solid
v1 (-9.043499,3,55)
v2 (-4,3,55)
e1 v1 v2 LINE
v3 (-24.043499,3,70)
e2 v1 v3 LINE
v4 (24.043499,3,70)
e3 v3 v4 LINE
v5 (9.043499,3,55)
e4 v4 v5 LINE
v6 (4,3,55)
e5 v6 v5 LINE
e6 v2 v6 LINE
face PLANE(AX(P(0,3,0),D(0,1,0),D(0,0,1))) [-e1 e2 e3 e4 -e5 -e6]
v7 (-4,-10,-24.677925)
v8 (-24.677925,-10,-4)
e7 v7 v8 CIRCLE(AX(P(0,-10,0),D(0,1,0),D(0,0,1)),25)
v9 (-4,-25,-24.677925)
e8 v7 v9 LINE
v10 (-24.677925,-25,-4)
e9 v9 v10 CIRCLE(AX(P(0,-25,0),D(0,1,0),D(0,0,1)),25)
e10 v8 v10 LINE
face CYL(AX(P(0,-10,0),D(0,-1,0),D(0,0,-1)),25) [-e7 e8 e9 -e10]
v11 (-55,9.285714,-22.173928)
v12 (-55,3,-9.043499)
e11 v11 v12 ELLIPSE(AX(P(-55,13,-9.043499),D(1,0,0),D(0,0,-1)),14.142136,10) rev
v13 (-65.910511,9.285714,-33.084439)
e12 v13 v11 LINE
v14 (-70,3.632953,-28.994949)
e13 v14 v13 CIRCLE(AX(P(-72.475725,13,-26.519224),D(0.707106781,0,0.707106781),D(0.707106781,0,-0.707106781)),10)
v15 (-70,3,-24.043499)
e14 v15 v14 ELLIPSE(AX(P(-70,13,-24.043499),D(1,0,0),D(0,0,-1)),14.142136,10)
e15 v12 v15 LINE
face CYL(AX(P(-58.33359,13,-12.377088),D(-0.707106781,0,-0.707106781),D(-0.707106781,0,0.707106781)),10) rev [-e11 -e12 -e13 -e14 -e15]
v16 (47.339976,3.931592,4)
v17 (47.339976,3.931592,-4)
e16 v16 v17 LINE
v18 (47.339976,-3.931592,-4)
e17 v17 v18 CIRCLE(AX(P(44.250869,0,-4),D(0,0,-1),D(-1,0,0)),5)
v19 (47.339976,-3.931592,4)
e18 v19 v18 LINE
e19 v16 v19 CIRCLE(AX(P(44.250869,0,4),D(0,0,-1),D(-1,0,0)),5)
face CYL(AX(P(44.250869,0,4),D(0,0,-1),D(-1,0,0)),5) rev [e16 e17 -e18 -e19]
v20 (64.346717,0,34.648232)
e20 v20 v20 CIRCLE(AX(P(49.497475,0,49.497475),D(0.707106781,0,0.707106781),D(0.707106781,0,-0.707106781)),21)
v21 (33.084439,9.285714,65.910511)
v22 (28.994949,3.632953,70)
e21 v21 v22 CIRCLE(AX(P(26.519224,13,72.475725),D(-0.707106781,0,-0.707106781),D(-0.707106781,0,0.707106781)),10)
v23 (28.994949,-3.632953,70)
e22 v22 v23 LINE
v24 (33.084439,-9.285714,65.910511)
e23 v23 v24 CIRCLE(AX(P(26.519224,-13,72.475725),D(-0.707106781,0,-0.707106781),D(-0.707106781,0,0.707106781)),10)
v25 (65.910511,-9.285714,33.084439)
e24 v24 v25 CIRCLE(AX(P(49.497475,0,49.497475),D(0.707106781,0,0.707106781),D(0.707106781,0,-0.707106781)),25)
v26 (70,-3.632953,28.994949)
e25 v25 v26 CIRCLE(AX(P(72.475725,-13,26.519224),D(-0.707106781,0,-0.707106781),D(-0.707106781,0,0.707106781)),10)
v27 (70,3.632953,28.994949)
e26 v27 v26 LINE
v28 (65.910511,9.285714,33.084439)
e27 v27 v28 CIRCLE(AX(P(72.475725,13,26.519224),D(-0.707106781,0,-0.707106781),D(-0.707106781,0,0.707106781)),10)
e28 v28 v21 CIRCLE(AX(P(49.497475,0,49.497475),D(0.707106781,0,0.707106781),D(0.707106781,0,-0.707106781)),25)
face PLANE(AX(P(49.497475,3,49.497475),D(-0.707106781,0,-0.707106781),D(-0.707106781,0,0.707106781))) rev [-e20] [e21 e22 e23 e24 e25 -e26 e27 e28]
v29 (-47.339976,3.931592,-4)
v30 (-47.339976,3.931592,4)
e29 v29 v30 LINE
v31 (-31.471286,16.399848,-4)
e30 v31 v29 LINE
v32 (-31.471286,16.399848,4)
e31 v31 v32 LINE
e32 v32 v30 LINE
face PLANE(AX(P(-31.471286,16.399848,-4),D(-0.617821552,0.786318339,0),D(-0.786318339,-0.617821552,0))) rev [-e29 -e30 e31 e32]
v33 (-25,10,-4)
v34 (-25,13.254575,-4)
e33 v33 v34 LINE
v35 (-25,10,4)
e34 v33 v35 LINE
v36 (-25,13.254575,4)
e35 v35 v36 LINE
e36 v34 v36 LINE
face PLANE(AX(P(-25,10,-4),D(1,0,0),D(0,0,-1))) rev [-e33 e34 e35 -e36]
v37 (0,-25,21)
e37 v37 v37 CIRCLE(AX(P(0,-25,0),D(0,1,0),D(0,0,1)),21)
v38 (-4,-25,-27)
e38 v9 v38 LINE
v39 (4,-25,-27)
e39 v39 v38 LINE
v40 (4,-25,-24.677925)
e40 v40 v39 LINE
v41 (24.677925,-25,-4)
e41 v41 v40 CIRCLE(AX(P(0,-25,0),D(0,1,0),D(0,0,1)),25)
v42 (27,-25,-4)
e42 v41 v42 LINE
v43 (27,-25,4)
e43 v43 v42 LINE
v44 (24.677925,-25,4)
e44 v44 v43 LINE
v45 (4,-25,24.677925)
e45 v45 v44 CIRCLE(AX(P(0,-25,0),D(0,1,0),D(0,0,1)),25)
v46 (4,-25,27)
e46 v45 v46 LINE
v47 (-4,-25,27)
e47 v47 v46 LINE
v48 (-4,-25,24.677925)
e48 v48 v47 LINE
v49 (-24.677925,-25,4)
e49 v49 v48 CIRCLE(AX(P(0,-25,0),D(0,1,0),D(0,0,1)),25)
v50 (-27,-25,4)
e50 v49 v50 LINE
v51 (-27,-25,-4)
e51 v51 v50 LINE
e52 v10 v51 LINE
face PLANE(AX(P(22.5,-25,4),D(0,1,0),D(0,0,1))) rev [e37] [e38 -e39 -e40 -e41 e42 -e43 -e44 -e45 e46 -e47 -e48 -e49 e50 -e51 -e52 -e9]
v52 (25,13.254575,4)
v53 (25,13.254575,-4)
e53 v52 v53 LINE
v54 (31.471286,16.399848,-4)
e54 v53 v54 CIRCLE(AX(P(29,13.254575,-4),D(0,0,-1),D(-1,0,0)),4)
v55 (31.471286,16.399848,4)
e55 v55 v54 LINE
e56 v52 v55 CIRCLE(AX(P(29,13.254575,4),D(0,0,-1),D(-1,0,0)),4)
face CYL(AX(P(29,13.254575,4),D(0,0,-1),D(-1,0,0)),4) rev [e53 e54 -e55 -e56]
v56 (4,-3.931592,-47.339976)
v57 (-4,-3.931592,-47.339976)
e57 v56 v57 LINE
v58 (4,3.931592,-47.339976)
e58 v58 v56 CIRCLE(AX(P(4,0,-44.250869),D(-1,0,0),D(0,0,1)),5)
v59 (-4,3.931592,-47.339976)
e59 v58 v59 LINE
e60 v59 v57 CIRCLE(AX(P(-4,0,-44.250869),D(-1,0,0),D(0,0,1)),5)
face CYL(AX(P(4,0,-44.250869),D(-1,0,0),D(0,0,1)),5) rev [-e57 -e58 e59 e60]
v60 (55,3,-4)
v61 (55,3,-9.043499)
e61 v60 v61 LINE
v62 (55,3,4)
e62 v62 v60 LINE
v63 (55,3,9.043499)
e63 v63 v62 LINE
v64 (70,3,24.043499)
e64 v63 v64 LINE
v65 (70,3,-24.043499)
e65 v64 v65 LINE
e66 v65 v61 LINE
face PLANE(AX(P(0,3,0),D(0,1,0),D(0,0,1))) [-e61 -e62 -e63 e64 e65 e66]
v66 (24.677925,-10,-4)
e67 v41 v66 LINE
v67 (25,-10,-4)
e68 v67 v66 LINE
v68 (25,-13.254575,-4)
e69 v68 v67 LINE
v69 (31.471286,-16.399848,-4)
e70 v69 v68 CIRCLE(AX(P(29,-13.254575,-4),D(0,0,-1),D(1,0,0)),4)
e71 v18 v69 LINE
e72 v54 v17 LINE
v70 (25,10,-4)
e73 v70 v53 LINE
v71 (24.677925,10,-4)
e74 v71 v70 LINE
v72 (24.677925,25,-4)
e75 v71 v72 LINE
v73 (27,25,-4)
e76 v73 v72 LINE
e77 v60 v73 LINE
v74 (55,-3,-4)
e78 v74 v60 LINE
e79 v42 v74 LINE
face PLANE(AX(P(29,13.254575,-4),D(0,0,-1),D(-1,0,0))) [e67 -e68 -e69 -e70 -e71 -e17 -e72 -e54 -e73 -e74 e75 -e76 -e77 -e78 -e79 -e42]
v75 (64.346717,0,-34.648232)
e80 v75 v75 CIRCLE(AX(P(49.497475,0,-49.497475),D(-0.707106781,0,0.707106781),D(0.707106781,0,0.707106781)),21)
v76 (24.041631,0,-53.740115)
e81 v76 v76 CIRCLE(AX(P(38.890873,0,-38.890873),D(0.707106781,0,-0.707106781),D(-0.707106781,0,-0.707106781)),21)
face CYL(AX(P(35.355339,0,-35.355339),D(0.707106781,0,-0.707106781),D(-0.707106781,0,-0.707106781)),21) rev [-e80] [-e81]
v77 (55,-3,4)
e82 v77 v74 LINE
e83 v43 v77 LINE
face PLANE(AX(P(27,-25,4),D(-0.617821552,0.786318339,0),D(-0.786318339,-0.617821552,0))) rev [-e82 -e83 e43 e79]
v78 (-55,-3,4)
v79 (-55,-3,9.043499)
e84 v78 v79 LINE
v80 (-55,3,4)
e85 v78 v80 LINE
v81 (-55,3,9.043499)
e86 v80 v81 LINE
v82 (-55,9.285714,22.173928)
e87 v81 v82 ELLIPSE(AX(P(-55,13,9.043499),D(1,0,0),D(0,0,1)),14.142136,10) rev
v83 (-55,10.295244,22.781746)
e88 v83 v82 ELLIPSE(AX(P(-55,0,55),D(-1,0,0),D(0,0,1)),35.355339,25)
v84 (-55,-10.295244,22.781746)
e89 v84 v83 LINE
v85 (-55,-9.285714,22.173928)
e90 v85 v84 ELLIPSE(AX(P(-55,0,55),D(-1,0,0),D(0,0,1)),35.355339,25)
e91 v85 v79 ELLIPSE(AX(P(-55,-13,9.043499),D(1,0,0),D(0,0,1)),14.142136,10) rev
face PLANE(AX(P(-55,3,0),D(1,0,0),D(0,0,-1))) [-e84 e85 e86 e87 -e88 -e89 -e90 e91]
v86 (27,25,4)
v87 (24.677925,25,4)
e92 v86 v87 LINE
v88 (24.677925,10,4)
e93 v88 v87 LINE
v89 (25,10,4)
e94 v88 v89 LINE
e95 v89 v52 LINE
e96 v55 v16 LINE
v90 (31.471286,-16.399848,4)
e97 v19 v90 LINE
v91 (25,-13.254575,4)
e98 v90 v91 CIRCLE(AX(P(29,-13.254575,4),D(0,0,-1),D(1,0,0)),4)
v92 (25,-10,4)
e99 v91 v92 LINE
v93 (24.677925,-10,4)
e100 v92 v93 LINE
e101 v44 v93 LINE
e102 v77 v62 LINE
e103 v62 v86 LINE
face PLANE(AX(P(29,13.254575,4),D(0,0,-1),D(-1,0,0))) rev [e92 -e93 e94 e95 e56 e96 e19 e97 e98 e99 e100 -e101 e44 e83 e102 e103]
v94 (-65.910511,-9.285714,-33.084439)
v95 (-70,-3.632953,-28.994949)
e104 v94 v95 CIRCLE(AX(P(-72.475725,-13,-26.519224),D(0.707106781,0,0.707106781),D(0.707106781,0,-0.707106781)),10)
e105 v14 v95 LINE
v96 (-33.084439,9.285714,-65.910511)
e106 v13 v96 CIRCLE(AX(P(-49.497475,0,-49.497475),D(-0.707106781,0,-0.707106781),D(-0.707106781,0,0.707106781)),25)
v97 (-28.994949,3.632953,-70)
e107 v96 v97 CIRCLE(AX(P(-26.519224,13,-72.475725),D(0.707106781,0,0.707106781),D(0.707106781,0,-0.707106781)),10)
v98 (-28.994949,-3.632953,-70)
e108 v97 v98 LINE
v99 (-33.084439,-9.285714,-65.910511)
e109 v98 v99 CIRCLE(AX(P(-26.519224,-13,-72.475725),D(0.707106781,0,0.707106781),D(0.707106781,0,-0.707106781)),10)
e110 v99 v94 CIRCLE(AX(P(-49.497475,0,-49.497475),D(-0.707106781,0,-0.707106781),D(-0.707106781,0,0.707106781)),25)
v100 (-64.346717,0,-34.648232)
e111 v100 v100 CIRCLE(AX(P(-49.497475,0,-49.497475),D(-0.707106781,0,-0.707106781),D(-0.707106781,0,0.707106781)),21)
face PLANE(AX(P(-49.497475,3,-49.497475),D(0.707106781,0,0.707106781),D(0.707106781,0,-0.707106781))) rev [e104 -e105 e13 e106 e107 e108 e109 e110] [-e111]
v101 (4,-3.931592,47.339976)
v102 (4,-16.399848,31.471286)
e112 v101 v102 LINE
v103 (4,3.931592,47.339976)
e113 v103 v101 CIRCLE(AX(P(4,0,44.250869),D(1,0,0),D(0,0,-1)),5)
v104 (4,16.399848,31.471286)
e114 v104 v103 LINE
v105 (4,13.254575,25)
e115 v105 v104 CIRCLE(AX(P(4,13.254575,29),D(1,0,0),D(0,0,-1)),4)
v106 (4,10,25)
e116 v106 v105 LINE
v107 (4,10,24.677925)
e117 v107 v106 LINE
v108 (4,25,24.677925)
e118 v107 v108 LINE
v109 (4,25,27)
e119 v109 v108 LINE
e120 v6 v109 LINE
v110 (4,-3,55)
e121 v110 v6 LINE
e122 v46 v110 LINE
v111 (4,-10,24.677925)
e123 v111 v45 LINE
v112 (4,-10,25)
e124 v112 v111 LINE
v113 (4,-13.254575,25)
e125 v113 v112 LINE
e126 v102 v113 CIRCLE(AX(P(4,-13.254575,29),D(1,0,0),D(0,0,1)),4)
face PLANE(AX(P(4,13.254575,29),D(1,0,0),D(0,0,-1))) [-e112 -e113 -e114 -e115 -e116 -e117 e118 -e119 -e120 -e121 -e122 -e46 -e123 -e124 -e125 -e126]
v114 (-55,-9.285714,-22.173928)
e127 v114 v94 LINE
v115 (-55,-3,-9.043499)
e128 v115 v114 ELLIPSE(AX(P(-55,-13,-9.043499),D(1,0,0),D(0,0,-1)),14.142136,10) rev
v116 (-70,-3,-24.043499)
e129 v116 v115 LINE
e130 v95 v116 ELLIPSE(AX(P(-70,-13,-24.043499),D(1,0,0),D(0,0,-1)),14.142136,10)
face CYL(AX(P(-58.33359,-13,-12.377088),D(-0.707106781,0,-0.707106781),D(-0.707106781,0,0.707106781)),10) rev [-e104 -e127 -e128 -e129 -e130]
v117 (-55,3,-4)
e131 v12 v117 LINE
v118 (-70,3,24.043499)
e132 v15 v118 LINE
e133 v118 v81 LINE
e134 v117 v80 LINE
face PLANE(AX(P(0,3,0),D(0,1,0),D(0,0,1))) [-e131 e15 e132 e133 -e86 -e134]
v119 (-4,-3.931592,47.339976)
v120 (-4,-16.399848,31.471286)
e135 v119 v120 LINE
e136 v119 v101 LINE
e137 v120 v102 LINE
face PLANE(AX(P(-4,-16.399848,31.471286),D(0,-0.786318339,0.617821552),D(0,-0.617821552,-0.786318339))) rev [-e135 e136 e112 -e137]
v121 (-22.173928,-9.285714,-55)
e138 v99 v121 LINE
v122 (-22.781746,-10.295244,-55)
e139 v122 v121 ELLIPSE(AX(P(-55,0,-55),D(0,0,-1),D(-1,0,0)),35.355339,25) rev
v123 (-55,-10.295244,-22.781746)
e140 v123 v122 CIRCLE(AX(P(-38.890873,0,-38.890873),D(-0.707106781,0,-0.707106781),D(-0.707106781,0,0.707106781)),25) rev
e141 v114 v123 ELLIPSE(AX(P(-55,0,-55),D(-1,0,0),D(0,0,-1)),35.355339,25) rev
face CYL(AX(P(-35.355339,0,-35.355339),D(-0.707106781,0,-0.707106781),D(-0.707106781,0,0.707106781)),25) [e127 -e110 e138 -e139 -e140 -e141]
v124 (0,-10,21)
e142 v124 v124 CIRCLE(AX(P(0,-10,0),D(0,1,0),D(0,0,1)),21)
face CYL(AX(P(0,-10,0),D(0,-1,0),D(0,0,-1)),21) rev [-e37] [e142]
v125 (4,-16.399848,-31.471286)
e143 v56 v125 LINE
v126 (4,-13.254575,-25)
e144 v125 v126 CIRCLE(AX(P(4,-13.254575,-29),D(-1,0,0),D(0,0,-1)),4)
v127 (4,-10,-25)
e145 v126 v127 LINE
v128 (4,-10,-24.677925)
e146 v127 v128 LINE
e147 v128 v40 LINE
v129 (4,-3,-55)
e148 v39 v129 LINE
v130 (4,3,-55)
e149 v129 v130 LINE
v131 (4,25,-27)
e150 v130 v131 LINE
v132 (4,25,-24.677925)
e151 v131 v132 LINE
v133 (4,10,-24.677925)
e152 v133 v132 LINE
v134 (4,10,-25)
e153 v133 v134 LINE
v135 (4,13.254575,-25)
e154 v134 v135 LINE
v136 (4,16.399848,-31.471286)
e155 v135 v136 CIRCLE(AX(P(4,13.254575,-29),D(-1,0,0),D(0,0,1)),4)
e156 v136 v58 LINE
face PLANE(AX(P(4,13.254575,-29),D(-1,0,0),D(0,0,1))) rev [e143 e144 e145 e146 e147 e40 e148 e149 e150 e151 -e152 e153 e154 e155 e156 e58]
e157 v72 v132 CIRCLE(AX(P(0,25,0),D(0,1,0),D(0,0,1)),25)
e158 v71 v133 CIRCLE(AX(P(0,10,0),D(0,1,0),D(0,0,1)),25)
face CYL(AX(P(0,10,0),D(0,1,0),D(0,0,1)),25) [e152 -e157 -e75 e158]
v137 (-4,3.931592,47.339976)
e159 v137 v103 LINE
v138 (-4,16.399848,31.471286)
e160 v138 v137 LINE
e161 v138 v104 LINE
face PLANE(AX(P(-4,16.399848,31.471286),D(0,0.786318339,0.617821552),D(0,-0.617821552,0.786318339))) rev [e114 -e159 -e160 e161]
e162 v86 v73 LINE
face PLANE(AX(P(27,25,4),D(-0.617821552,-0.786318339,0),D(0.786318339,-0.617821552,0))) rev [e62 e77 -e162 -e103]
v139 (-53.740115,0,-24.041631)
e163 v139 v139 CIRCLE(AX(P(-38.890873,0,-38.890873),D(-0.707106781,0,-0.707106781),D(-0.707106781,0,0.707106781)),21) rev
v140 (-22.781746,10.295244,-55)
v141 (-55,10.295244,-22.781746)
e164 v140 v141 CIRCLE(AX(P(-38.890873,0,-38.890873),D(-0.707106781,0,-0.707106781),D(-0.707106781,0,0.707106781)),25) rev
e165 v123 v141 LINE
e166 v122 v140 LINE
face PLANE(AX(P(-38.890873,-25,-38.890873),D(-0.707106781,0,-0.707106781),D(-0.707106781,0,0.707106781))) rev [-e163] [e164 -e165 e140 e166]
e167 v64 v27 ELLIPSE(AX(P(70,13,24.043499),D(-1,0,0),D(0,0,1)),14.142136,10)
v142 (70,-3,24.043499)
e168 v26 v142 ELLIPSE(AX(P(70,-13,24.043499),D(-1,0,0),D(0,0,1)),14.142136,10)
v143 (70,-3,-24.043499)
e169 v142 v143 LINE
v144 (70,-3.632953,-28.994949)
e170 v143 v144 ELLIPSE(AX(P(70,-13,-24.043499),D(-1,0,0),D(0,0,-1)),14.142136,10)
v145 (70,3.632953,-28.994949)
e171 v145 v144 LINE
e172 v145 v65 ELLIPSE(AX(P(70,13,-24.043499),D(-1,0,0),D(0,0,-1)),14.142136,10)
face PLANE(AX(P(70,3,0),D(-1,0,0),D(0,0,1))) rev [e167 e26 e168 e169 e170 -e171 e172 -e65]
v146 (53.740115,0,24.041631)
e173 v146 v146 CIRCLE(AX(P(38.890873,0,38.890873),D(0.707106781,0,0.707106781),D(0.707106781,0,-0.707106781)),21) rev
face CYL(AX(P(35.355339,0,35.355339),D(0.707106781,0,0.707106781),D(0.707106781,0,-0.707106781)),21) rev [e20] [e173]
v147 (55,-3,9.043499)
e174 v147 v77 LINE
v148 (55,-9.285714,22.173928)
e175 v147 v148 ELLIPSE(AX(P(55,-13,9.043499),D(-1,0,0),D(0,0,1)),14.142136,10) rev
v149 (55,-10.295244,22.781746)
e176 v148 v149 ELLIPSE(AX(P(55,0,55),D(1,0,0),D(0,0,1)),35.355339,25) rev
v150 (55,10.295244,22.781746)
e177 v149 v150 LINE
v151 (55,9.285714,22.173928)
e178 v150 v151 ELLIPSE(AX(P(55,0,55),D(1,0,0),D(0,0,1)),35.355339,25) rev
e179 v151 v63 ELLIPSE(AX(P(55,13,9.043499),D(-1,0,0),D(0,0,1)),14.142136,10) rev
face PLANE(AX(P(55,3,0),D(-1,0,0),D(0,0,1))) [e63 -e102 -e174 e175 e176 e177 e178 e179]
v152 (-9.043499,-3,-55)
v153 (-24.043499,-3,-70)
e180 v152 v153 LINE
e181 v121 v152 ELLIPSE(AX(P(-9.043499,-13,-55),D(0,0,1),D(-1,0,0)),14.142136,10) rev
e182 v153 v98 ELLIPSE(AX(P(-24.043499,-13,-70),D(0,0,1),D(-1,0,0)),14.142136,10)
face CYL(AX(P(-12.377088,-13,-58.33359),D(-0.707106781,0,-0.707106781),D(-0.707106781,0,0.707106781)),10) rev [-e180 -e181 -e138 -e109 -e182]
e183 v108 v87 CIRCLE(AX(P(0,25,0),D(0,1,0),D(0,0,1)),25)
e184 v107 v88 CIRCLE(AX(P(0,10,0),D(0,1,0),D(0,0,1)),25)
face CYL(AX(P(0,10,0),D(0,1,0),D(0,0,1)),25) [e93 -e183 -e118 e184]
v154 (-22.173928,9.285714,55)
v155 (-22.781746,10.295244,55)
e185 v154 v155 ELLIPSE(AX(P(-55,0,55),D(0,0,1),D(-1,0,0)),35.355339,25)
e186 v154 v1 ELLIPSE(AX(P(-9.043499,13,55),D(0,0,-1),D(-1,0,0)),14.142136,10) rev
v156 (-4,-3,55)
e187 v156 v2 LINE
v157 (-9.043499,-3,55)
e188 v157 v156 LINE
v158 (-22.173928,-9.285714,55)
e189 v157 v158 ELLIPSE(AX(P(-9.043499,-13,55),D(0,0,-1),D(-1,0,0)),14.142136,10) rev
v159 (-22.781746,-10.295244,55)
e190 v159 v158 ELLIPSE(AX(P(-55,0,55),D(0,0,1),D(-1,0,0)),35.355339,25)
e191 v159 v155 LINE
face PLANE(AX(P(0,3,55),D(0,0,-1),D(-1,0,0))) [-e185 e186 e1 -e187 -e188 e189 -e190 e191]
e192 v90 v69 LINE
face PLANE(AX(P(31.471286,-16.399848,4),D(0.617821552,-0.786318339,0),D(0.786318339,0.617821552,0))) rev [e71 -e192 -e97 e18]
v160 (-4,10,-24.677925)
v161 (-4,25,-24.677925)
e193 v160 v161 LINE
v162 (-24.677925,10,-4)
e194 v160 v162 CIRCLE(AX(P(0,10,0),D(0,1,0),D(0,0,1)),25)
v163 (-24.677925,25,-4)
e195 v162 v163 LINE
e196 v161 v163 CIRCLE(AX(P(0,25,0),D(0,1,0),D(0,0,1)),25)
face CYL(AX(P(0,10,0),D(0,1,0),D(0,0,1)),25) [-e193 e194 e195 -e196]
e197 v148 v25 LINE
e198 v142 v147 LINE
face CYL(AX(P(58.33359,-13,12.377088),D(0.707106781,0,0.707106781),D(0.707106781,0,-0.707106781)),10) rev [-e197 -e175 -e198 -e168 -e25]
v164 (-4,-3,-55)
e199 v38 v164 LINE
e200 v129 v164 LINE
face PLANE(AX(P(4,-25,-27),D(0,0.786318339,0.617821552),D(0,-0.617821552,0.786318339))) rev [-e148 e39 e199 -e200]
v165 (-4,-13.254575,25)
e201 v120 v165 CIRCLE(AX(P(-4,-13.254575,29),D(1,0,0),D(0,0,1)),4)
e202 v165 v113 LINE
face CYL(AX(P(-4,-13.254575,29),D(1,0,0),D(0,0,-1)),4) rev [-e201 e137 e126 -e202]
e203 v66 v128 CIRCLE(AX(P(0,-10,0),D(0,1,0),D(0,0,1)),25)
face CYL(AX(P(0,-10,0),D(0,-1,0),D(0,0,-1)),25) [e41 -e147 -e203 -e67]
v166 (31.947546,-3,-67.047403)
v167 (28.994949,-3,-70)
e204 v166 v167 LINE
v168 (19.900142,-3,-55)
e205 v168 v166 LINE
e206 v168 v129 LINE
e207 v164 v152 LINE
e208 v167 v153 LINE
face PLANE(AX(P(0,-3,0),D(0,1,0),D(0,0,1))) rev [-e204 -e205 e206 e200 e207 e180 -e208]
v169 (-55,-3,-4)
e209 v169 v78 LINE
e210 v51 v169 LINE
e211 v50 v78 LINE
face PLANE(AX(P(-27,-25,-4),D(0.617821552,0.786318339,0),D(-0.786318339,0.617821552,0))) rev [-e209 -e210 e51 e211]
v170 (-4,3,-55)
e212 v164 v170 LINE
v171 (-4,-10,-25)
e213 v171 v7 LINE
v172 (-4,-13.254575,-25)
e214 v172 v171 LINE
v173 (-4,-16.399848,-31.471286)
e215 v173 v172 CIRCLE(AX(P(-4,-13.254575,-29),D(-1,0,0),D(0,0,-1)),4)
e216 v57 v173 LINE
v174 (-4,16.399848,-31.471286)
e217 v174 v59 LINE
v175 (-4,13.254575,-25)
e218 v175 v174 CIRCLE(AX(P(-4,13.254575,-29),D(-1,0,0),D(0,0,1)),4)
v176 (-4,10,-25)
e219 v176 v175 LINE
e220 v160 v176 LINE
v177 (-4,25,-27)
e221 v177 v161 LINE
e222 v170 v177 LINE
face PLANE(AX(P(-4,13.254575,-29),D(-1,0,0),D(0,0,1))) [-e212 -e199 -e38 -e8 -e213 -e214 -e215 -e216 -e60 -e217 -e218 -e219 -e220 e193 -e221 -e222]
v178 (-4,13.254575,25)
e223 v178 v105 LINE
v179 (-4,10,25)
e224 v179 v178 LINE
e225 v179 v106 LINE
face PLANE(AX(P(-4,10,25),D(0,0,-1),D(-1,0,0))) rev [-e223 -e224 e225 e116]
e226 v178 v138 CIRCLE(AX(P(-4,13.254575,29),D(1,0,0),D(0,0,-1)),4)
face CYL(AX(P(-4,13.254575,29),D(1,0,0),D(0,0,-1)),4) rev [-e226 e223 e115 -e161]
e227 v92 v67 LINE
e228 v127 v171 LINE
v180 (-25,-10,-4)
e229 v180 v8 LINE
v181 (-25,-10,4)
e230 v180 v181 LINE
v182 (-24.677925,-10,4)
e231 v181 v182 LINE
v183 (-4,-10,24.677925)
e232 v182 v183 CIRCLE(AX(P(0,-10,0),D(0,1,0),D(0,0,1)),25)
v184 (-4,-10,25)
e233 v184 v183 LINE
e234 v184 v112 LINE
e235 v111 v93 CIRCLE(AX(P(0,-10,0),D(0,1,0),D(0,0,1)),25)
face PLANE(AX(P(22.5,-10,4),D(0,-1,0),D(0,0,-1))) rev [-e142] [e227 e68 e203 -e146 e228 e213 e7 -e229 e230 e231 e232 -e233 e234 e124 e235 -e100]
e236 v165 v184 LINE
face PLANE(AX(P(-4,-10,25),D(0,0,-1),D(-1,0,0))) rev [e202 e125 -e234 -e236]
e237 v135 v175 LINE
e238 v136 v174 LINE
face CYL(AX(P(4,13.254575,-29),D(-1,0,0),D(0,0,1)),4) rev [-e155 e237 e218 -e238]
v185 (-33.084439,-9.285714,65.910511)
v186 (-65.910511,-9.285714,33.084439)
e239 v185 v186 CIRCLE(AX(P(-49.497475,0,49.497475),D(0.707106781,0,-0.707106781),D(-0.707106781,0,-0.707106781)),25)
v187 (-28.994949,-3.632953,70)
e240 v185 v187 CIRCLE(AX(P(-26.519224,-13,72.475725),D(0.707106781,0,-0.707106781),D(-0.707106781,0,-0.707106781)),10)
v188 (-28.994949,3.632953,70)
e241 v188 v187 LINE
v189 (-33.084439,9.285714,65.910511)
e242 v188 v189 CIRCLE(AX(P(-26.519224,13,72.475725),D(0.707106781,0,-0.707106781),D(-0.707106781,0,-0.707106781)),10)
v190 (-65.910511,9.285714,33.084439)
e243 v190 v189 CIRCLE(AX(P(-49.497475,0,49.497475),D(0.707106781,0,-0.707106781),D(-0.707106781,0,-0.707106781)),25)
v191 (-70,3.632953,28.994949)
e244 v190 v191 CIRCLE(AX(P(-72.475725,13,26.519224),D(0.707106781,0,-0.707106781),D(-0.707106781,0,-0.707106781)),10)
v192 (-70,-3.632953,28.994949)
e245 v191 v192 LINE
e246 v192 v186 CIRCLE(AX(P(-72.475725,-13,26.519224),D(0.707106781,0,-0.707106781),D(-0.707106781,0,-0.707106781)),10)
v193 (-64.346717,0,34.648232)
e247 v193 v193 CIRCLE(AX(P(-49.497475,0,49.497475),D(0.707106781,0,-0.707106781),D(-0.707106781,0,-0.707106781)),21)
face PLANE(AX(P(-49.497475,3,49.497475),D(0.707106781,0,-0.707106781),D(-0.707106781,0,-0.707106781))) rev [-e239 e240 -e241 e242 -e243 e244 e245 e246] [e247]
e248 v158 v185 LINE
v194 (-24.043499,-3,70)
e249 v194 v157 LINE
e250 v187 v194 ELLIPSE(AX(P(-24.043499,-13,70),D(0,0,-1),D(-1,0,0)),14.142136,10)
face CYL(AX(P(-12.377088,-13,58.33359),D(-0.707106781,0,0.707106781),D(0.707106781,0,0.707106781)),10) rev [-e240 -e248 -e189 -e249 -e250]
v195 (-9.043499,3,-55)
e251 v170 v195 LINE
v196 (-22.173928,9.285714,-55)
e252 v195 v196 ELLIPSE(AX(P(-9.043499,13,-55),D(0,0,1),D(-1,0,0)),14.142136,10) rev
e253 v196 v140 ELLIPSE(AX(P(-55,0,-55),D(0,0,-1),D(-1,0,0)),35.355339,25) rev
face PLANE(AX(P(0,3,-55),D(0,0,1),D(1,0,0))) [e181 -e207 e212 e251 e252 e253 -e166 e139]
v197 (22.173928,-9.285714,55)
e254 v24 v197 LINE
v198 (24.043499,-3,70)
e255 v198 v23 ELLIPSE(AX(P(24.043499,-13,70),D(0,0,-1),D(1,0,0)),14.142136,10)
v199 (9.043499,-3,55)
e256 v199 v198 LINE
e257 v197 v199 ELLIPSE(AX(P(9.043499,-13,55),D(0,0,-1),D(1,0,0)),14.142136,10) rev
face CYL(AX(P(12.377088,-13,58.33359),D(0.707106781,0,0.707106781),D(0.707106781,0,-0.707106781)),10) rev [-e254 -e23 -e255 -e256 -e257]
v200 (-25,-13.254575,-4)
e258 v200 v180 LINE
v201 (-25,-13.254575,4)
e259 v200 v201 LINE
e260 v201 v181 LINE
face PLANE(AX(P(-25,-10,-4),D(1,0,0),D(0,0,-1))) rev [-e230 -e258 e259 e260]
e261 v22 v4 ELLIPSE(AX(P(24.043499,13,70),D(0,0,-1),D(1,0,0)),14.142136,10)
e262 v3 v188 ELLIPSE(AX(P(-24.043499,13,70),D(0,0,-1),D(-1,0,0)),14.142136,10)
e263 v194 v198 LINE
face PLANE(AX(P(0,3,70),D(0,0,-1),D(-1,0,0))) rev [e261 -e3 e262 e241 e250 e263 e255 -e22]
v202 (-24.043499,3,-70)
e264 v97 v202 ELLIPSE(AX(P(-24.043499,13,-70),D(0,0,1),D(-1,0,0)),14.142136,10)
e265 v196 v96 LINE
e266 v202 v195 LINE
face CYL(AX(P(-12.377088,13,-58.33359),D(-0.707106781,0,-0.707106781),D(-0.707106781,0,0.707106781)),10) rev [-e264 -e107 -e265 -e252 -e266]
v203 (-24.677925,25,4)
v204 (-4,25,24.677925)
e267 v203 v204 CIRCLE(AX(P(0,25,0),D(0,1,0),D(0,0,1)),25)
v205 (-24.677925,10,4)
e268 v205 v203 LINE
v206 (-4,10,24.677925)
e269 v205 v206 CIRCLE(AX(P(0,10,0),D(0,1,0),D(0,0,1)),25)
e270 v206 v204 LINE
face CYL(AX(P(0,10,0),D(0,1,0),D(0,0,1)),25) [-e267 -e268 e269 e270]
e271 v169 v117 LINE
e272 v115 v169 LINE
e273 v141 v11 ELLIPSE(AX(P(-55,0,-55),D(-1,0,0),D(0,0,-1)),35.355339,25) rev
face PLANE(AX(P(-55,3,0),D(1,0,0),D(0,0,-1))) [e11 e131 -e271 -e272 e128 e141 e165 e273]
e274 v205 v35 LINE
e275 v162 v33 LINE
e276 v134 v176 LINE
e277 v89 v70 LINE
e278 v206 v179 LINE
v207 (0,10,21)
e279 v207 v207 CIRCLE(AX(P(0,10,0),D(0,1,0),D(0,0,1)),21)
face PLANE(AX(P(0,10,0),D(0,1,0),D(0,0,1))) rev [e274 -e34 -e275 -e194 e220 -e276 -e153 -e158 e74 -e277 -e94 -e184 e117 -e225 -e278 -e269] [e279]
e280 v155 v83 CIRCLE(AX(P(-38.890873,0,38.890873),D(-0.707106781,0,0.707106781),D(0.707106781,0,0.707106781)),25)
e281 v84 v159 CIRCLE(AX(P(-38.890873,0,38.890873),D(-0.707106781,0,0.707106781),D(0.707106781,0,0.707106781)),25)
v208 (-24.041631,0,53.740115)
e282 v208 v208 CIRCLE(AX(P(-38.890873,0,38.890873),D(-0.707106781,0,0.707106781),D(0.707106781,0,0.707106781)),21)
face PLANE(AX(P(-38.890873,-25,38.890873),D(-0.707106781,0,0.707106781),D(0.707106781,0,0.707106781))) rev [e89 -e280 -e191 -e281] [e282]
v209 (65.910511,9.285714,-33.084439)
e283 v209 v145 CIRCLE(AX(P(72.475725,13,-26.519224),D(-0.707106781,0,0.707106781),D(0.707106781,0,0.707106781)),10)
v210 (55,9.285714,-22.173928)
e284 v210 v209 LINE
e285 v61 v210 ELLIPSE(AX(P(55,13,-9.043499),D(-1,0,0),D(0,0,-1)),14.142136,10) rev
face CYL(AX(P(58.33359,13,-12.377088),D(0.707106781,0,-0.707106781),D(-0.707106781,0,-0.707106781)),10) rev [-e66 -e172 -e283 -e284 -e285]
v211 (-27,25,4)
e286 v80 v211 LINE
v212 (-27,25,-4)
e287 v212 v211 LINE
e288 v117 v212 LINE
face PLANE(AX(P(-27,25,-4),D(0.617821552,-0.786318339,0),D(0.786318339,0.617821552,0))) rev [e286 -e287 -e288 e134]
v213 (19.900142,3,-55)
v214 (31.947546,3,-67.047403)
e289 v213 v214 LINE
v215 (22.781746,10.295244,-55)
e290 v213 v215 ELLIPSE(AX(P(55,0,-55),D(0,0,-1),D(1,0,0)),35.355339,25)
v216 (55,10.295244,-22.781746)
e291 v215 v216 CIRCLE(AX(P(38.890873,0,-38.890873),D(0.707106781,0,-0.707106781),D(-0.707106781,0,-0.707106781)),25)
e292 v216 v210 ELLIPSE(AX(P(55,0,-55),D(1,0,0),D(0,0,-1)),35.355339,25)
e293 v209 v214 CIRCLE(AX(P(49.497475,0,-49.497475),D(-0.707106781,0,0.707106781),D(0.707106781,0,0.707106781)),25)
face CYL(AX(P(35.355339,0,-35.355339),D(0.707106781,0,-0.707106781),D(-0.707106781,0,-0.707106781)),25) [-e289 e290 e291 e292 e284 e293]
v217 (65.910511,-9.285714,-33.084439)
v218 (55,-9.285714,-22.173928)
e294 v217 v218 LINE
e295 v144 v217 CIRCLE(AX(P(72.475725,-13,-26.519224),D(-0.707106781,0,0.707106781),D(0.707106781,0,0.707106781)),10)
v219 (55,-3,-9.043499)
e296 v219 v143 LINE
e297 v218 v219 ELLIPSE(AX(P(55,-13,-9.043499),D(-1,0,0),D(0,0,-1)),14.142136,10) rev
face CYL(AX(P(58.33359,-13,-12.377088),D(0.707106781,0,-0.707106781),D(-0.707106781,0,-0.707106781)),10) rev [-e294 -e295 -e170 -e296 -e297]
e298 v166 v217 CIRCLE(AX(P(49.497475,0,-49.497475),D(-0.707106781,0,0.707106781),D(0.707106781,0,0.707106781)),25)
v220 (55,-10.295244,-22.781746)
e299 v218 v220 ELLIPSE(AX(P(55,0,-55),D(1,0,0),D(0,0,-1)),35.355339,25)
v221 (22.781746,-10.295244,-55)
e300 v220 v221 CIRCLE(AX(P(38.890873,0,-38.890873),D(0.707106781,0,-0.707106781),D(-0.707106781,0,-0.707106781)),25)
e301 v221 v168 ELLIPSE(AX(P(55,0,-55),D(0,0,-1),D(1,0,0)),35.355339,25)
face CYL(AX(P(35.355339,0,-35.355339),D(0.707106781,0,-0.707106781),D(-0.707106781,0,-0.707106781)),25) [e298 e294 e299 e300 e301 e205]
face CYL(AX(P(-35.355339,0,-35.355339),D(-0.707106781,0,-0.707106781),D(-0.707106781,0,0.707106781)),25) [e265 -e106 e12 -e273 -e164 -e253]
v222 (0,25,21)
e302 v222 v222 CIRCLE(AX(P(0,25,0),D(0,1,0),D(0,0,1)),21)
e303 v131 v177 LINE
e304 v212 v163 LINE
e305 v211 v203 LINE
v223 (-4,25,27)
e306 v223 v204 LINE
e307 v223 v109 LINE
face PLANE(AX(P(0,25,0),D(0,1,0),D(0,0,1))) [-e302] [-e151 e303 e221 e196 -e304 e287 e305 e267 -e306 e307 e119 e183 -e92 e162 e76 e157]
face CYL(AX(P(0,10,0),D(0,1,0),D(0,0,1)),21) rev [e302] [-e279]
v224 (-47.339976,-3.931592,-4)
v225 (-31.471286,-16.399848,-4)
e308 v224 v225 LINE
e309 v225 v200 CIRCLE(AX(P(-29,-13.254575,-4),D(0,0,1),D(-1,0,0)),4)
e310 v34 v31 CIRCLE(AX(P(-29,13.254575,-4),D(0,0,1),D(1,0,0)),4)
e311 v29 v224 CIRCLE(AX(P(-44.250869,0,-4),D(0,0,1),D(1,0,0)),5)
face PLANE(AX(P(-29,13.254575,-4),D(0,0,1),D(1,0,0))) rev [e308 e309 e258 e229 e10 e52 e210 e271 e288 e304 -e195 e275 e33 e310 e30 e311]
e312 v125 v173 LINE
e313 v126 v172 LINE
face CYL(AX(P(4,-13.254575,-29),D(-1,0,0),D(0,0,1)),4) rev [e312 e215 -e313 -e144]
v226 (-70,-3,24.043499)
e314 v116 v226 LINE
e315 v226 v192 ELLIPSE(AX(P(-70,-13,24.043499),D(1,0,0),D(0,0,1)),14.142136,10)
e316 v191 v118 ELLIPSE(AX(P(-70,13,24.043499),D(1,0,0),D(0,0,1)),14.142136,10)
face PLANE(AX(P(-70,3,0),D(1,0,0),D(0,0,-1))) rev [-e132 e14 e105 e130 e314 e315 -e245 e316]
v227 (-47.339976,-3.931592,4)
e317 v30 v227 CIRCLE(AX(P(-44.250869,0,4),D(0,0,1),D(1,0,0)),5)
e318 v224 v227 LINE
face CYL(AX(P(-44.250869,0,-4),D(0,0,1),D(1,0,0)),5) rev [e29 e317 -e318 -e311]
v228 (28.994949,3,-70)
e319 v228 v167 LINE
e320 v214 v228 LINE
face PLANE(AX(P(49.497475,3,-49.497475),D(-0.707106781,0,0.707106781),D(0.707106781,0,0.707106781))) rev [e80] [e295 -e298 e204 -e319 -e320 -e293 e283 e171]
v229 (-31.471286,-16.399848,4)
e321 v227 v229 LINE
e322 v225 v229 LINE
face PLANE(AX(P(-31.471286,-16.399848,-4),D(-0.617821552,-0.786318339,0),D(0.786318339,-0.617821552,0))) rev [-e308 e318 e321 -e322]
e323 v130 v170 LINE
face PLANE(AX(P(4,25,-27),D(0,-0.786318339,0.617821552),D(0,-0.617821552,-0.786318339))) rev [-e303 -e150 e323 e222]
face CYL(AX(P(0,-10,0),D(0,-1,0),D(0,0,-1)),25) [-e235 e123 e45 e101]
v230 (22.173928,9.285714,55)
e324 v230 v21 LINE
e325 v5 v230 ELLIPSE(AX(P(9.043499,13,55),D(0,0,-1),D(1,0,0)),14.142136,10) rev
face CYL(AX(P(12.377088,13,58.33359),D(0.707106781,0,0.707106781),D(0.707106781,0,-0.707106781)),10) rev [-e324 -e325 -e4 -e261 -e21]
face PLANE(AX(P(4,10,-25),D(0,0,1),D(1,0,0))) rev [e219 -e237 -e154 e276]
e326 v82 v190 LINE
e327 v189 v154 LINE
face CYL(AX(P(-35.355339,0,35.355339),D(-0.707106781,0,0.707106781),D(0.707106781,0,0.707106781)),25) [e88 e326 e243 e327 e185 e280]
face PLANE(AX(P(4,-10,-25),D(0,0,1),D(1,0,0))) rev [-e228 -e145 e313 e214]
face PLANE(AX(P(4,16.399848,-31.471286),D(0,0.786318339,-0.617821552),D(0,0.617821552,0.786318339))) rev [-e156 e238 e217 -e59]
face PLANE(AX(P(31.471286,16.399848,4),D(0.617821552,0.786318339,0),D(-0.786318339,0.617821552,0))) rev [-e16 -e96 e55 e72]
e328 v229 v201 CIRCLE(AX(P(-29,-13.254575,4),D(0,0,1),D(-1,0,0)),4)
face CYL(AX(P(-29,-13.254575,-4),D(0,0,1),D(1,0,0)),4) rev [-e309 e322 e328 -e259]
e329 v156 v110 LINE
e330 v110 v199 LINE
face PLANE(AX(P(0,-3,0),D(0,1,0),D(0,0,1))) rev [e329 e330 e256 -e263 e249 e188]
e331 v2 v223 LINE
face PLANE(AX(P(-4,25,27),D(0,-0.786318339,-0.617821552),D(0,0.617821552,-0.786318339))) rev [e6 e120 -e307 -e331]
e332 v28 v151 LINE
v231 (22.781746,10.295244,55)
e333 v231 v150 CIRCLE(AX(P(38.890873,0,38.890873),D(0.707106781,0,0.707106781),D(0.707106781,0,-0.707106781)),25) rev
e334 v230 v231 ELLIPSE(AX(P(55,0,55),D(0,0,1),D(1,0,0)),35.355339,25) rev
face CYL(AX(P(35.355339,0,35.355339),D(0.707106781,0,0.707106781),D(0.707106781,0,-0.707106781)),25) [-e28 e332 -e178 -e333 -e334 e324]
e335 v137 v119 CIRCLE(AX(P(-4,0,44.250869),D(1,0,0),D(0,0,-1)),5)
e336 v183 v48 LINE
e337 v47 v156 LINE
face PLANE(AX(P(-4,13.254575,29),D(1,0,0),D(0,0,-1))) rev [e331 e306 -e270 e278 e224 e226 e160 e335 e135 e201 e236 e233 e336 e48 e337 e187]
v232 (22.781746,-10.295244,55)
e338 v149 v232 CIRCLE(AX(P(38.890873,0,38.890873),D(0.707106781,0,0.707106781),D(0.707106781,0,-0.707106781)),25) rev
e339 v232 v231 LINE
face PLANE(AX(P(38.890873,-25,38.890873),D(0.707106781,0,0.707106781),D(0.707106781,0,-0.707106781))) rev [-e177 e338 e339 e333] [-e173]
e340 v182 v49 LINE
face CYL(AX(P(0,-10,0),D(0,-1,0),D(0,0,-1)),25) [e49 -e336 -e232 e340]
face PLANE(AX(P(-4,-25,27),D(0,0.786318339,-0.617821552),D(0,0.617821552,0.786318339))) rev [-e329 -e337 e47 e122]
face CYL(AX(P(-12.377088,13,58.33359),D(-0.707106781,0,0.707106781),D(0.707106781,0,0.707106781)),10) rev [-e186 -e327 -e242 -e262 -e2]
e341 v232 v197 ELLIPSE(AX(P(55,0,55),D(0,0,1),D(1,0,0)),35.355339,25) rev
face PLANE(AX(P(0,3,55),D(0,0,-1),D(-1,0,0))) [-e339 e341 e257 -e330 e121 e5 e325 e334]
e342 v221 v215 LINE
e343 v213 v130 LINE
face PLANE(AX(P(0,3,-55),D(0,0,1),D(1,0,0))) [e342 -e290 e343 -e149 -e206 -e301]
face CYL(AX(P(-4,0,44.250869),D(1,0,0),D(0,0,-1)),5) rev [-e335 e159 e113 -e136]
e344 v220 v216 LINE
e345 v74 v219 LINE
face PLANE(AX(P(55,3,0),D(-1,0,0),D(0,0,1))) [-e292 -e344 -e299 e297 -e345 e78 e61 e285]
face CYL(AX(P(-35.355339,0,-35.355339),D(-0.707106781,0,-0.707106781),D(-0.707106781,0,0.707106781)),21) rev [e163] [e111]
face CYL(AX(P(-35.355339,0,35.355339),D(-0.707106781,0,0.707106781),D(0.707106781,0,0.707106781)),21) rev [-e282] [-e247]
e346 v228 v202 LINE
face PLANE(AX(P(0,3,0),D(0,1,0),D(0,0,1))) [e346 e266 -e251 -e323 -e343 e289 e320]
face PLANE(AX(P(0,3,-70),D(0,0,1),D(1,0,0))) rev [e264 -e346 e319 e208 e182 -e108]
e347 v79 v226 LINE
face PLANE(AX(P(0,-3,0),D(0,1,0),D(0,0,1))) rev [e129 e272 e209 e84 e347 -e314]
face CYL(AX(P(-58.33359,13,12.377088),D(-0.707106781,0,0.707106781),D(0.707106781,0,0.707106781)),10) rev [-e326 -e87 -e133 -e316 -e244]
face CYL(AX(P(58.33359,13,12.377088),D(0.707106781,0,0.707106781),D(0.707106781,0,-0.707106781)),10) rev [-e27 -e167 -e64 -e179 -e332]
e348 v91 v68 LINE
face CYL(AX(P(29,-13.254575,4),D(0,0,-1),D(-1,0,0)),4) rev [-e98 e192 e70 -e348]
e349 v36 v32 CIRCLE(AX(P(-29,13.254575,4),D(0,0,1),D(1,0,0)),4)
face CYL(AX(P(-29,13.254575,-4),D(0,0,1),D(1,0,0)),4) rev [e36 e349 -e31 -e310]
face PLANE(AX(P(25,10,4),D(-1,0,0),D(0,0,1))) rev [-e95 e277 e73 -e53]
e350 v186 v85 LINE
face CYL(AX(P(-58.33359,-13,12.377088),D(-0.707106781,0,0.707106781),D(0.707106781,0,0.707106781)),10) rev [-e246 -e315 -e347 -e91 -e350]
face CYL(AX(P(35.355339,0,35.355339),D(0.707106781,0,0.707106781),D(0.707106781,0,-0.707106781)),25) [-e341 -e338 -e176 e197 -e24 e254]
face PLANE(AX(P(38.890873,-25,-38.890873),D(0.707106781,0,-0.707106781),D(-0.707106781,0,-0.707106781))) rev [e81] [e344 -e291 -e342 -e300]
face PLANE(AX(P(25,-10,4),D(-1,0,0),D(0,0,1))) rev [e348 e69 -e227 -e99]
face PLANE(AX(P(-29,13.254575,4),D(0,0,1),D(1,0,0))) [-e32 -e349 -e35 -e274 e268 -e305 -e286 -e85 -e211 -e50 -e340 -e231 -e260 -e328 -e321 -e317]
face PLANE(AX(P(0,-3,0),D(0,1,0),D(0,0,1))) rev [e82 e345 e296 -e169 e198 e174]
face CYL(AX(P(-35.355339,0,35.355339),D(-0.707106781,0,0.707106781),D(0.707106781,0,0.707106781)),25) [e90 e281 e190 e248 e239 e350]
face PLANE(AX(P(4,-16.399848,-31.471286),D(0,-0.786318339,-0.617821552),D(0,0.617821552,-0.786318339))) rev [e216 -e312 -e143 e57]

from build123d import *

# Parameters (mm, degrees)
EXTRUDE_START              = 25
SKETCH_1_R                 = 25
SKETCH_1_R_2               = 21
EXTRUDE_1_DEPTH            = 15
EXTRUDE_2_DEPTH            = 3
EXTRUDE_START_2            = -25
SKETCH_1_5_R               = 25
SKETCH_1_5_R_2             = 21
EXTRUDE_7_DEPTH            = 15
SKETCH_5_R                 = 25
SKETCH_5_R_2               = 21
EXTRUDE_9_DEPTH            = 20
SKETCH_5_2_R               = 21
CUT_EXTRUDE_4_DEPTH        = 20
MIRROR_4_COPY_1_SKETCH_R   = 25
MIRROR_4_COPY_1_SKETCH_R_2 = 21
MIRROR_4_COPY_1_DEPTH      = 20
MIRROR_4_COPY_2_SKETCH_R   = 21
MIRROR_4_COPY_2_DEPTH      = 20
FILLET_4_R                 = 10
SKETCH_1_6_R               = 25
CUT_EXTRUDE_5_DEPTH        = 25
EXTRUDE_10_DEPTH           = 4
PATTERN_CIRCULAR_1_COUNT   = 4


with BuildPart() as part:
    # 草图1 → 凸台-拉伸1 (new body)
    with BuildSketch(Plane(origin=(0, 0, 0), x_dir=(1, 0, 0), z_dir=(0, 1, 0)).offset(EXTRUDE_START)):
        with Locations(Location((0, 0, 0), (0, 0, 270))):
            Circle(SKETCH_1_R)
        with Locations(Location((0, 0, 0), (0, 0, 270))):
            Circle(SKETCH_1_R_2, mode=Mode.SUBTRACT)
    extrude(amount=-EXTRUDE_1_DEPTH)



with BuildPart() as body_2:
    # 草图1<3> → 凸台-拉伸2 (new, symmetric)
    with BuildSketch(Plane(origin=(0, 0, 0), x_dir=(1, 0, 0), z_dir=(0, 1, 0))):
        Polygon((-28.994949366, -70), (28.994949366, -70), (70, -28.994949366), (70, 28.994949366), (28.994949366, 70), (-28.994949366, 70), (-70, 28.994949366), (-70, -28.994949366), align=None)
        Polygon((55, 22.781745931), (22.781745931, 55), (-22.781745931, 55), (-55, 22.781745931), (-55, -22.781745931), (-22.781745931, -55), (22.781745931, -55), (55, -22.781745931), align=None, mode=Mode.SUBTRACT)
    extrude(amount=EXTRUDE_2_DEPTH, both=True)

    # 草图5 → 凸台-拉伸9 (add)
    with BuildSketch(Plane(origin=(-49.497474683, 0, -49.497474683), x_dir=(-0.7071067811865477, 0, 0.7071067811865475), z_dir=(-0.7071067811865475, 0, -0.7071067811865477))):
        Circle(SKETCH_5_R)
        Circle(SKETCH_5_R_2, mode=Mode.SUBTRACT)
    extrude_9 = extrude(amount=-EXTRUDE_9_DEPTH)

    # 草图5<2> → 切除-拉伸4 (cut)
    with BuildSketch(Plane(origin=(-49.497474683, 0, -49.497474683), x_dir=(-0.7071067811865477, 0, 0.7071067811865475), z_dir=(-0.7071067811865475, 0, -0.7071067811865477))):
        Circle(SKETCH_5_2_R)
    cut_extrude_4 = extrude(amount=-CUT_EXTRUDE_4_DEPTH, mode=Mode.SUBTRACT)

    # 镜向3: 凸台-拉伸9, 切除-拉伸4 across plane
    add(extrude_9.mirror(Plane.XY))
    add(cut_extrude_4.mirror(Plane.XY), mode=Mode.SUBTRACT)

    # 镜向4: 凸台-拉伸9, 切除-拉伸4 across plane
    add(extrude_9.mirror(Plane(origin=(0, 0, 0), x_dir=(0, 0, 1), z_dir=(1, 0, 0))))
    add(cut_extrude_4.mirror(Plane(origin=(0, 0, 0), x_dir=(0, 0, 1), z_dir=(1, 0, 0))), mode=Mode.SUBTRACT)

    # 镜向4 copy 1 sketch → 镜向4 copy 1 (add)
    with BuildSketch(Plane(origin=(49.497474683, 0, 49.497474683), x_dir=(0.7071067811865477, 0, -0.7071067811865475), z_dir=(0.7071067811865475, 0, 0.7071067811865477))):
        Circle(MIRROR_4_COPY_1_SKETCH_R)
        Circle(MIRROR_4_COPY_1_SKETCH_R_2, mode=Mode.SUBTRACT)
    extrude(amount=-MIRROR_4_COPY_1_DEPTH)

    # 镜向4 copy 2 sketch → 镜向4 copy 2 (cut)
    with BuildSketch(Plane(origin=(49.497474683, 0, 49.497474683), x_dir=(0.7071067811865477, 0, -0.7071067811865475), z_dir=(0.7071067811865475, 0, 0.7071067811865477))):
        Circle(MIRROR_4_COPY_2_SKETCH_R)
    extrude(amount=-MIRROR_4_COPY_2_DEPTH, mode=Mode.SUBTRACT)

    # 圆角4
    # the kernel refuses this fillet: 10 mm, written as the material it adds along each edge
    with BuildSketch(Plane(origin=(-6.329337922, 3, -41.429195472), x_dir=(-0.17522775195055232, 0.9688087891285418, 0.17522775195055224), z_dir=(-0.7071067811865475, 0, -0.7071067811865477))) as fillet_4_piece_1_section:
        with BuildLine():
            CenterArc((7.785702636, 9.915452075), FILLET_4_R, 194.347925284, 68.196252011)
            Line((-1.902385256, 7.437357442), (0, 0))
            ThreePointArc((0, 0), (3.244042765, 0.211369813), (6.48808553, 0))
        make_face()
    fillet_4_piece_1 = extrude(amount=36.229617178, mode=Mode.PRIVATE)
    fillet_4_piece_1 = split(fillet_4_piece_1, bisect_by=Plane(origin=(-13.032672025, 3.061224537, -55), z_dir=(0, 0, -1)), keep=Keep.TOP, mode=Mode.PRIVATE)
    fillet_4_piece_1 = split(fillet_4_piece_1, bisect_by=Plane(origin=(-13.032672025, 3.061224537, -70), z_dir=(0, 0, 1)), keep=Keep.TOP, mode=Mode.PRIVATE)
    add(fillet_4_piece_1)
    with BuildSketch(Plane(origin=(-6.329337922, -3, -41.429195472), x_dir=(-0.17522775195055199, -0.968808789128542, 0.17522775195055193), z_dir=(-0.7071067811865475, 0, -0.7071067811865477))) as fillet_4_piece_2_section:
        with BuildLine():
            CenterArc((7.785702636, -9.915452075), FILLET_4_R, 97.455822705, 68.196252011)
            Line((-1.902385256, -7.437357442), (0, 0))
            ThreePointArc((0, 0), (3.244042765, -0.211369813), (6.48808553, 0))
        make_face()
    fillet_4_piece_2 = extrude(amount=36.229617178, mode=Mode.PRIVATE)
    fillet_4_piece_2 = split(fillet_4_piece_2, bisect_by=Plane(origin=(-13.032672025, -3.061224537, -55), z_dir=(0, 0, -1)), keep=Keep.TOP, mode=Mode.PRIVATE)
    fillet_4_piece_2 = split(fillet_4_piece_2, bisect_by=Plane(origin=(-13.032672025, -3.061224537, -70), z_dir=(0, 0, 1)), keep=Keep.TOP, mode=Mode.PRIVATE)
    add(fillet_4_piece_2)
    with BuildSketch(Plane(origin=(-41.429195472, -3, -6.329337922), x_dir=(-0.7071067811865476, 0, 0.7071067811865475), z_dir=(-0.7071067811865475, 0, -0.7071067811865477))) as fillet_4_piece_3_section:
        with BuildLine():
            CenterArc((7.676806327, -10), FILLET_4_R, 90, 68.196252011)
            ThreePointArc((-1.607808993, -6.285714286), (-0.599127564, -3.195236583), (0, 0))
            Line((0, 0), (7.676806327, 0))
        make_face()
    fillet_4_piece_3 = extrude(amount=36.229617178, mode=Mode.PRIVATE)
    fillet_4_piece_3 = split(fillet_4_piece_3, bisect_by=Plane(origin=(-70, -3.061224537, -13.032672026), z_dir=(1, 0, 0)), keep=Keep.TOP, mode=Mode.PRIVATE)
    fillet_4_piece_3 = split(fillet_4_piece_3, bisect_by=Plane(origin=(-55, -3.061224537, -13.032672026), z_dir=(-1, 0, 0)), keep=Keep.TOP, mode=Mode.PRIVATE)
    add(fillet_4_piece_3)
    with BuildSketch(Plane(origin=(-41.429195472, 3, -6.329337922), x_dir=(0.17522775195055176, 0.9688087891285421, -0.17522775195055168), z_dir=(-0.7071067811865475, 0, -0.7071067811865477))) as fillet_4_piece_4_section:
        with BuildLine():
            CenterArc((7.785702636, -9.915452075), FILLET_4_R, 97.455822705, 68.196252011)
            Line((-1.902385256, -7.437357442), (0, 0))
            ThreePointArc((0, 0), (3.244042765, -0.211369813), (6.48808553, 0))
        make_face()
    fillet_4_piece_4 = extrude(amount=36.229617178, mode=Mode.PRIVATE)
    fillet_4_piece_4 = split(fillet_4_piece_4, bisect_by=Plane(origin=(-55, 3.061224537, -13.032672025), z_dir=(-1, 0, 0)), keep=Keep.TOP, mode=Mode.PRIVATE)
    fillet_4_piece_4 = split(fillet_4_piece_4, bisect_by=Plane(origin=(-70, 3.061224537, -13.032672025), z_dir=(1, 0, 0)), keep=Keep.TOP, mode=Mode.PRIVATE)
    add(fillet_4_piece_4)
    with BuildSketch(Plane(origin=(41.429195472, -3, -6.329337922), x_dir=(0.7071067811865476, 0, 0.7071067811865475), z_dir=(0.7071067811865475, 0, -0.7071067811865477))) as fillet_4_piece_5_section:
        with BuildLine():
            CenterArc((7.676806327, 10), FILLET_4_R, 201.803747989, 68.196252011)
            ThreePointArc((-1.607808993, 6.285714286), (-0.599127564, 3.195236583), (0, 0))
            Line((0, 0), (7.676806327, 0))
        make_face()
    fillet_4_piece_5 = extrude(amount=36.229617178, mode=Mode.PRIVATE)
    fillet_4_piece_5 = split(fillet_4_piece_5, bisect_by=Plane(origin=(55, -3.061224537, -13.032672026), z_dir=(1, 0, 0)), keep=Keep.TOP, mode=Mode.PRIVATE)
    fillet_4_piece_5 = split(fillet_4_piece_5, bisect_by=Plane(origin=(70, -3.061224537, -13.032672026), z_dir=(-1, 0, 0)), keep=Keep.TOP, mode=Mode.PRIVATE)
    add(fillet_4_piece_5)
    with BuildSketch(Plane(origin=(41.429195472, 3, -6.329337922), x_dir=(0.7071067811865477, 0, 0.7071067811865474), z_dir=(0.7071067811865475, 0, -0.7071067811865477))) as fillet_4_piece_6_section:
        with BuildLine():
            CenterArc((7.676806327, -10), FILLET_4_R, 90, 68.196252011)
            ThreePointArc((-1.607808993, -6.285714286), (-0.599127564, -3.195236583), (0, 0))
            Line((0, 0), (7.676806327, 0))
        make_face()
    fillet_4_piece_6 = extrude(amount=36.229617178, mode=Mode.PRIVATE)
    fillet_4_piece_6 = split(fillet_4_piece_6, bisect_by=Plane(origin=(55, 3.061224537, -13.032672026), z_dir=(1, 0, 0)), keep=Keep.TOP, mode=Mode.PRIVATE)
    fillet_4_piece_6 = split(fillet_4_piece_6, bisect_by=Plane(origin=(70, 3.061224537, -13.032672026), z_dir=(-1, 0, 0)), keep=Keep.TOP, mode=Mode.PRIVATE)
    add(fillet_4_piece_6)
    with BuildSketch(Plane(origin=(41.429195472, -3, 6.329337922), x_dir=(-0.17522775195055218, -0.9688087891285418, 0.17522775195055212), z_dir=(0.7071067811865475, 0, 0.7071067811865477))) as fillet_4_piece_7_section:
        with BuildLine():
            CenterArc((7.785702636, 9.915452075), FILLET_4_R, 194.347925284, 68.196252011)
            Line((-1.902385256, 7.437357442), (0, 0))
            ThreePointArc((0, 0), (3.244042765, 0.211369813), (6.48808553, 0))
        make_face()
    fillet_4_piece_7 = extrude(amount=36.229617178, mode=Mode.PRIVATE)
    fillet_4_piece_7 = split(fillet_4_piece_7, bisect_by=Plane(origin=(55, -3.061224537, 13.032672025), z_dir=(1, 0, 0)), keep=Keep.TOP, mode=Mode.PRIVATE)
    fillet_4_piece_7 = split(fillet_4_piece_7, bisect_by=Plane(origin=(70, -3.061224537, 13.032672025), z_dir=(-1, 0, 0)), keep=Keep.TOP, mode=Mode.PRIVATE)
    add(fillet_4_piece_7)
    with BuildSketch(Plane(origin=(41.429195472, 3, 6.329337922), x_dir=(0.7071067811865476, 0, -0.7071067811865474), z_dir=(0.7071067811865475, 0, 0.7071067811865477))) as fillet_4_piece_8_section:
        with BuildLine():
            CenterArc((7.676806327, 10), FILLET_4_R, 201.803747989, 68.196252011)
            ThreePointArc((-1.607808993, 6.285714286), (-0.599127564, 3.195236583), (0, 0))
            Line((0, 0), (7.676806327, 0))
        make_face()
    fillet_4_piece_8 = extrude(amount=36.229617178, mode=Mode.PRIVATE)
    fillet_4_piece_8 = split(fillet_4_piece_8, bisect_by=Plane(origin=(55, 3.061224537, 13.032672026), z_dir=(1, 0, 0)), keep=Keep.TOP, mode=Mode.PRIVATE)
    fillet_4_piece_8 = split(fillet_4_piece_8, bisect_by=Plane(origin=(70, 3.061224537, 13.032672026), z_dir=(-1, 0, 0)), keep=Keep.TOP, mode=Mode.PRIVATE)
    add(fillet_4_piece_8)
    with BuildSketch(Plane(origin=(6.329337922, 3, 41.429195472), x_dir=(0.17522775195055232, 0.9688087891285418, -0.17522775195055224), z_dir=(0.7071067811865475, 0, 0.7071067811865477))) as fillet_4_piece_9_section:
        with BuildLine():
            CenterArc((7.785702636, 9.915452075), FILLET_4_R, 194.347925284, 68.196252011)
            Line((-1.902385256, 7.437357442), (0, 0))
            ThreePointArc((0, 0), (3.244042765, 0.211369813), (6.48808553, 0))
        make_face()
    fillet_4_piece_9 = extrude(amount=36.229617178, mode=Mode.PRIVATE)
    fillet_4_piece_9 = split(fillet_4_piece_9, bisect_by=Plane(origin=(13.032672025, 3.061224537, 70), z_dir=(0, 0, -1)), keep=Keep.TOP, mode=Mode.PRIVATE)
    fillet_4_piece_9 = split(fillet_4_piece_9, bisect_by=Plane(origin=(13.032672025, 3.061224537, 55), z_dir=(0, 0, 1)), keep=Keep.TOP, mode=Mode.PRIVATE)
    add(fillet_4_piece_9)
    with BuildSketch(Plane(origin=(6.329337922, -3, 41.429195472), x_dir=(0.17522775195055199, -0.968808789128542, -0.17522775195055193), z_dir=(0.7071067811865475, 0, 0.7071067811865477))) as fillet_4_piece_10_section:
        with BuildLine():
            CenterArc((7.785702636, -9.915452075), FILLET_4_R, 97.455822705, 68.196252011)
            Line((-1.902385256, -7.437357442), (0, 0))
            ThreePointArc((0, 0), (3.244042765, -0.211369813), (6.48808553, 0))
        make_face()
    fillet_4_piece_10 = extrude(amount=36.229617178, mode=Mode.PRIVATE)
    fillet_4_piece_10 = split(fillet_4_piece_10, bisect_by=Plane(origin=(13.032672025, -3.061224537, 70), z_dir=(0, 0, -1)), keep=Keep.TOP, mode=Mode.PRIVATE)
    fillet_4_piece_10 = split(fillet_4_piece_10, bisect_by=Plane(origin=(13.032672025, -3.061224537, 55), z_dir=(0, 0, 1)), keep=Keep.TOP, mode=Mode.PRIVATE)
    add(fillet_4_piece_10)
    with BuildSketch(Plane(origin=(-6.329337922, -3, 41.429195472), x_dir=(-0.17522775195055199, -0.968808789128542, -0.17522775195055193), z_dir=(-0.7071067811865475, 0, 0.7071067811865477))) as fillet_4_piece_11_section:
        with BuildLine():
            CenterArc((7.785702636, 9.915452075), FILLET_4_R, 194.347925284, 68.196252011)
            Line((-1.902385256, 7.437357442), (0, 0))
            ThreePointArc((0, 0), (3.244042765, 0.211369813), (6.48808553, 0))
        make_face()
    fillet_4_piece_11 = extrude(amount=36.229617178, mode=Mode.PRIVATE)
    fillet_4_piece_11 = split(fillet_4_piece_11, bisect_by=Plane(origin=(-13.032672025, -3.061224537, 70), z_dir=(0, 0, -1)), keep=Keep.TOP, mode=Mode.PRIVATE)
    fillet_4_piece_11 = split(fillet_4_piece_11, bisect_by=Plane(origin=(-13.032672025, -3.061224537, 55), z_dir=(0, 0, 1)), keep=Keep.TOP, mode=Mode.PRIVATE)
    add(fillet_4_piece_11)
    with BuildSketch(Plane(origin=(-6.329337922, 3, 41.429195472), x_dir=(-0.17522775195055232, 0.9688087891285418, -0.17522775195055224), z_dir=(-0.7071067811865475, 0, 0.7071067811865477))) as fillet_4_piece_12_section:
        with BuildLine():
            CenterArc((7.785702636, -9.915452075), FILLET_4_R, 97.455822705, 68.196252011)
            Line((-1.902385256, -7.437357442), (0, 0))
            ThreePointArc((0, 0), (3.244042765, -0.211369813), (6.48808553, 0))
        make_face()
    fillet_4_piece_12 = extrude(amount=36.229617178, mode=Mode.PRIVATE)
    fillet_4_piece_12 = split(fillet_4_piece_12, bisect_by=Plane(origin=(-13.032672025, 3.061224537, 70), z_dir=(0, 0, -1)), keep=Keep.TOP, mode=Mode.PRIVATE)
    fillet_4_piece_12 = split(fillet_4_piece_12, bisect_by=Plane(origin=(-13.032672025, 3.061224537, 55), z_dir=(0, 0, 1)), keep=Keep.TOP, mode=Mode.PRIVATE)
    add(fillet_4_piece_12)
    with BuildSketch(Plane(origin=(-41.429195472, -3, 6.329337922), x_dir=(-0.7071067811865477, 0, -0.7071067811865475), z_dir=(-0.7071067811865475, 0, 0.7071067811865477))) as fillet_4_piece_13_section:
        with BuildLine():
            CenterArc((7.676806327, 10), FILLET_4_R, 201.803747989, 68.196252011)
            ThreePointArc((-1.607808993, 6.285714286), (-0.599127564, 3.195236583), (0, 0))
            Line((0, 0), (7.676806327, 0))
        make_face()
    fillet_4_piece_13 = extrude(amount=36.229617178, mode=Mode.PRIVATE)
    fillet_4_piece_13 = split(fillet_4_piece_13, bisect_by=Plane(origin=(-70, -3.061224537, 13.032672026), z_dir=(1, 0, 0)), keep=Keep.TOP, mode=Mode.PRIVATE)
    fillet_4_piece_13 = split(fillet_4_piece_13, bisect_by=Plane(origin=(-55, -3.061224537, 13.032672026), z_dir=(-1, 0, 0)), keep=Keep.TOP, mode=Mode.PRIVATE)
    add(fillet_4_piece_13)
    with BuildSketch(Plane(origin=(-41.429195472, 3, 6.329337922), x_dir=(-0.7071067811865476, 0, -0.7071067811865475), z_dir=(-0.7071067811865475, 0, 0.7071067811865477))) as fillet_4_piece_14_section:
        with BuildLine():
            CenterArc((7.676806327, -10), FILLET_4_R, 90, 68.196252011)
            ThreePointArc((-1.607808993, -6.285714286), (-0.599127564, -3.195236583), (0, 0))
            Line((0, 0), (7.676806327, 0))
        make_face()
    fillet_4_piece_14 = extrude(amount=36.229617178, mode=Mode.PRIVATE)
    fillet_4_piece_14 = split(fillet_4_piece_14, bisect_by=Plane(origin=(-55, 3.061224537, 13.032672026), z_dir=(-1, 0, 0)), keep=Keep.TOP, mode=Mode.PRIVATE)
    fillet_4_piece_14 = split(fillet_4_piece_14, bisect_by=Plane(origin=(-70, 3.061224537, 13.032672026), z_dir=(1, 0, 0)), keep=Keep.TOP, mode=Mode.PRIVATE)
    add(fillet_4_piece_14)

    # 草图1<6> → 切除-拉伸5 (cut, symmetric)
    with BuildSketch(Plane(origin=(0, 0, 0), x_dir=(1, 0, 0), z_dir=(0, 1, 0))):
        Polygon((55, -22.781745931), (55, 22.781745931), (22.781745931, 55), (-22.781745931, 55), (-55, 22.781745931), (-55, -22.781745931), (-22.781745931, -55), (22.781745931, -55), align=None)
        with Locations(Location((0, 0, 0), (0, 0, 270))):
            Circle(SKETCH_1_6_R, mode=Mode.SUBTRACT)
    extrude(amount=CUT_EXTRUDE_5_DEPTH, both=True, mode=Mode.SUBTRACT)


with BuildPart() as body_3:
    # 草图1<5> → 凸台-拉伸7 (new body)
    with BuildSketch(Plane(origin=(0, 0, 0), x_dir=(1, 0, 0), z_dir=(0, 1, 0)).offset(EXTRUDE_START_2)):
        with Locations(Location((0, 0, 0), (0, 0, 270))):
            Circle(SKETCH_1_5_R)
        with Locations(Location((0, 0, 0), (0, 0, 270))):
            Circle(SKETCH_1_5_R_2, mode=Mode.SUBTRACT)
    extrude(amount=EXTRUDE_7_DEPTH)


with BuildPart() as part_1:
    add(part.part)

    add(body_2.part)  # 凸台-拉伸10 merges body 2

    add(body_3.part)  # 凸台-拉伸10 merges body 3
    # 草图7 → 凸台-拉伸10 (add, symmetric)
    with BuildSketch(Plane.XY):
        with BuildLine():
            Line((22.5, 25), (27, 25))
            Line((27, 25), (55, 3))
            Line((55, 3), (55, -3))
            Line((55, -3), (27, -25))
            Line((27, -25), (22.5, -25))
            Line((22.5, -25), (22.5, -10))
            Line((22.5, -10), (25, -10))
            Line((25, -10), (25, -13.254574963))
            ThreePointArc((25, -13.254574963), (27.251449862, -16.852153651), (31.471286208, -16.399848318))
            Line((31.471286208, -16.399848318), (47.339976457, -3.931591694))
            ThreePointArc((47.339976457, -3.931591694), (49.250868697, 0), (47.339976457, 3.931591694))
            Line((47.339976457, 3.931591694), (31.471286208, 16.399848318))
            ThreePointArc((31.471286208, 16.399848318), (27.251449862, 16.852153651), (25, 13.254574963))
            Line((25, 13.254574963), (25, 10))
            Line((25, 10), (22.5, 10))
            Line((22.5, 10), (22.5, 25))
        make_face()
    extrude_10 = extrude(amount=EXTRUDE_10_DEPTH, both=True)

    # 阵列(圆周)1: 凸台-拉伸10 ×4 about axis
    pattern_circular_1_axis = Axis((0, 0, 0), (0, 1, 0))
    for i in range(1, PATTERN_CIRCULAR_1_COUNT):
        add(extrude_10.rotate(pattern_circular_1_axis, i * 360 / PATTERN_CIRCULAR_1_COUNT))


solid = part_1.part
